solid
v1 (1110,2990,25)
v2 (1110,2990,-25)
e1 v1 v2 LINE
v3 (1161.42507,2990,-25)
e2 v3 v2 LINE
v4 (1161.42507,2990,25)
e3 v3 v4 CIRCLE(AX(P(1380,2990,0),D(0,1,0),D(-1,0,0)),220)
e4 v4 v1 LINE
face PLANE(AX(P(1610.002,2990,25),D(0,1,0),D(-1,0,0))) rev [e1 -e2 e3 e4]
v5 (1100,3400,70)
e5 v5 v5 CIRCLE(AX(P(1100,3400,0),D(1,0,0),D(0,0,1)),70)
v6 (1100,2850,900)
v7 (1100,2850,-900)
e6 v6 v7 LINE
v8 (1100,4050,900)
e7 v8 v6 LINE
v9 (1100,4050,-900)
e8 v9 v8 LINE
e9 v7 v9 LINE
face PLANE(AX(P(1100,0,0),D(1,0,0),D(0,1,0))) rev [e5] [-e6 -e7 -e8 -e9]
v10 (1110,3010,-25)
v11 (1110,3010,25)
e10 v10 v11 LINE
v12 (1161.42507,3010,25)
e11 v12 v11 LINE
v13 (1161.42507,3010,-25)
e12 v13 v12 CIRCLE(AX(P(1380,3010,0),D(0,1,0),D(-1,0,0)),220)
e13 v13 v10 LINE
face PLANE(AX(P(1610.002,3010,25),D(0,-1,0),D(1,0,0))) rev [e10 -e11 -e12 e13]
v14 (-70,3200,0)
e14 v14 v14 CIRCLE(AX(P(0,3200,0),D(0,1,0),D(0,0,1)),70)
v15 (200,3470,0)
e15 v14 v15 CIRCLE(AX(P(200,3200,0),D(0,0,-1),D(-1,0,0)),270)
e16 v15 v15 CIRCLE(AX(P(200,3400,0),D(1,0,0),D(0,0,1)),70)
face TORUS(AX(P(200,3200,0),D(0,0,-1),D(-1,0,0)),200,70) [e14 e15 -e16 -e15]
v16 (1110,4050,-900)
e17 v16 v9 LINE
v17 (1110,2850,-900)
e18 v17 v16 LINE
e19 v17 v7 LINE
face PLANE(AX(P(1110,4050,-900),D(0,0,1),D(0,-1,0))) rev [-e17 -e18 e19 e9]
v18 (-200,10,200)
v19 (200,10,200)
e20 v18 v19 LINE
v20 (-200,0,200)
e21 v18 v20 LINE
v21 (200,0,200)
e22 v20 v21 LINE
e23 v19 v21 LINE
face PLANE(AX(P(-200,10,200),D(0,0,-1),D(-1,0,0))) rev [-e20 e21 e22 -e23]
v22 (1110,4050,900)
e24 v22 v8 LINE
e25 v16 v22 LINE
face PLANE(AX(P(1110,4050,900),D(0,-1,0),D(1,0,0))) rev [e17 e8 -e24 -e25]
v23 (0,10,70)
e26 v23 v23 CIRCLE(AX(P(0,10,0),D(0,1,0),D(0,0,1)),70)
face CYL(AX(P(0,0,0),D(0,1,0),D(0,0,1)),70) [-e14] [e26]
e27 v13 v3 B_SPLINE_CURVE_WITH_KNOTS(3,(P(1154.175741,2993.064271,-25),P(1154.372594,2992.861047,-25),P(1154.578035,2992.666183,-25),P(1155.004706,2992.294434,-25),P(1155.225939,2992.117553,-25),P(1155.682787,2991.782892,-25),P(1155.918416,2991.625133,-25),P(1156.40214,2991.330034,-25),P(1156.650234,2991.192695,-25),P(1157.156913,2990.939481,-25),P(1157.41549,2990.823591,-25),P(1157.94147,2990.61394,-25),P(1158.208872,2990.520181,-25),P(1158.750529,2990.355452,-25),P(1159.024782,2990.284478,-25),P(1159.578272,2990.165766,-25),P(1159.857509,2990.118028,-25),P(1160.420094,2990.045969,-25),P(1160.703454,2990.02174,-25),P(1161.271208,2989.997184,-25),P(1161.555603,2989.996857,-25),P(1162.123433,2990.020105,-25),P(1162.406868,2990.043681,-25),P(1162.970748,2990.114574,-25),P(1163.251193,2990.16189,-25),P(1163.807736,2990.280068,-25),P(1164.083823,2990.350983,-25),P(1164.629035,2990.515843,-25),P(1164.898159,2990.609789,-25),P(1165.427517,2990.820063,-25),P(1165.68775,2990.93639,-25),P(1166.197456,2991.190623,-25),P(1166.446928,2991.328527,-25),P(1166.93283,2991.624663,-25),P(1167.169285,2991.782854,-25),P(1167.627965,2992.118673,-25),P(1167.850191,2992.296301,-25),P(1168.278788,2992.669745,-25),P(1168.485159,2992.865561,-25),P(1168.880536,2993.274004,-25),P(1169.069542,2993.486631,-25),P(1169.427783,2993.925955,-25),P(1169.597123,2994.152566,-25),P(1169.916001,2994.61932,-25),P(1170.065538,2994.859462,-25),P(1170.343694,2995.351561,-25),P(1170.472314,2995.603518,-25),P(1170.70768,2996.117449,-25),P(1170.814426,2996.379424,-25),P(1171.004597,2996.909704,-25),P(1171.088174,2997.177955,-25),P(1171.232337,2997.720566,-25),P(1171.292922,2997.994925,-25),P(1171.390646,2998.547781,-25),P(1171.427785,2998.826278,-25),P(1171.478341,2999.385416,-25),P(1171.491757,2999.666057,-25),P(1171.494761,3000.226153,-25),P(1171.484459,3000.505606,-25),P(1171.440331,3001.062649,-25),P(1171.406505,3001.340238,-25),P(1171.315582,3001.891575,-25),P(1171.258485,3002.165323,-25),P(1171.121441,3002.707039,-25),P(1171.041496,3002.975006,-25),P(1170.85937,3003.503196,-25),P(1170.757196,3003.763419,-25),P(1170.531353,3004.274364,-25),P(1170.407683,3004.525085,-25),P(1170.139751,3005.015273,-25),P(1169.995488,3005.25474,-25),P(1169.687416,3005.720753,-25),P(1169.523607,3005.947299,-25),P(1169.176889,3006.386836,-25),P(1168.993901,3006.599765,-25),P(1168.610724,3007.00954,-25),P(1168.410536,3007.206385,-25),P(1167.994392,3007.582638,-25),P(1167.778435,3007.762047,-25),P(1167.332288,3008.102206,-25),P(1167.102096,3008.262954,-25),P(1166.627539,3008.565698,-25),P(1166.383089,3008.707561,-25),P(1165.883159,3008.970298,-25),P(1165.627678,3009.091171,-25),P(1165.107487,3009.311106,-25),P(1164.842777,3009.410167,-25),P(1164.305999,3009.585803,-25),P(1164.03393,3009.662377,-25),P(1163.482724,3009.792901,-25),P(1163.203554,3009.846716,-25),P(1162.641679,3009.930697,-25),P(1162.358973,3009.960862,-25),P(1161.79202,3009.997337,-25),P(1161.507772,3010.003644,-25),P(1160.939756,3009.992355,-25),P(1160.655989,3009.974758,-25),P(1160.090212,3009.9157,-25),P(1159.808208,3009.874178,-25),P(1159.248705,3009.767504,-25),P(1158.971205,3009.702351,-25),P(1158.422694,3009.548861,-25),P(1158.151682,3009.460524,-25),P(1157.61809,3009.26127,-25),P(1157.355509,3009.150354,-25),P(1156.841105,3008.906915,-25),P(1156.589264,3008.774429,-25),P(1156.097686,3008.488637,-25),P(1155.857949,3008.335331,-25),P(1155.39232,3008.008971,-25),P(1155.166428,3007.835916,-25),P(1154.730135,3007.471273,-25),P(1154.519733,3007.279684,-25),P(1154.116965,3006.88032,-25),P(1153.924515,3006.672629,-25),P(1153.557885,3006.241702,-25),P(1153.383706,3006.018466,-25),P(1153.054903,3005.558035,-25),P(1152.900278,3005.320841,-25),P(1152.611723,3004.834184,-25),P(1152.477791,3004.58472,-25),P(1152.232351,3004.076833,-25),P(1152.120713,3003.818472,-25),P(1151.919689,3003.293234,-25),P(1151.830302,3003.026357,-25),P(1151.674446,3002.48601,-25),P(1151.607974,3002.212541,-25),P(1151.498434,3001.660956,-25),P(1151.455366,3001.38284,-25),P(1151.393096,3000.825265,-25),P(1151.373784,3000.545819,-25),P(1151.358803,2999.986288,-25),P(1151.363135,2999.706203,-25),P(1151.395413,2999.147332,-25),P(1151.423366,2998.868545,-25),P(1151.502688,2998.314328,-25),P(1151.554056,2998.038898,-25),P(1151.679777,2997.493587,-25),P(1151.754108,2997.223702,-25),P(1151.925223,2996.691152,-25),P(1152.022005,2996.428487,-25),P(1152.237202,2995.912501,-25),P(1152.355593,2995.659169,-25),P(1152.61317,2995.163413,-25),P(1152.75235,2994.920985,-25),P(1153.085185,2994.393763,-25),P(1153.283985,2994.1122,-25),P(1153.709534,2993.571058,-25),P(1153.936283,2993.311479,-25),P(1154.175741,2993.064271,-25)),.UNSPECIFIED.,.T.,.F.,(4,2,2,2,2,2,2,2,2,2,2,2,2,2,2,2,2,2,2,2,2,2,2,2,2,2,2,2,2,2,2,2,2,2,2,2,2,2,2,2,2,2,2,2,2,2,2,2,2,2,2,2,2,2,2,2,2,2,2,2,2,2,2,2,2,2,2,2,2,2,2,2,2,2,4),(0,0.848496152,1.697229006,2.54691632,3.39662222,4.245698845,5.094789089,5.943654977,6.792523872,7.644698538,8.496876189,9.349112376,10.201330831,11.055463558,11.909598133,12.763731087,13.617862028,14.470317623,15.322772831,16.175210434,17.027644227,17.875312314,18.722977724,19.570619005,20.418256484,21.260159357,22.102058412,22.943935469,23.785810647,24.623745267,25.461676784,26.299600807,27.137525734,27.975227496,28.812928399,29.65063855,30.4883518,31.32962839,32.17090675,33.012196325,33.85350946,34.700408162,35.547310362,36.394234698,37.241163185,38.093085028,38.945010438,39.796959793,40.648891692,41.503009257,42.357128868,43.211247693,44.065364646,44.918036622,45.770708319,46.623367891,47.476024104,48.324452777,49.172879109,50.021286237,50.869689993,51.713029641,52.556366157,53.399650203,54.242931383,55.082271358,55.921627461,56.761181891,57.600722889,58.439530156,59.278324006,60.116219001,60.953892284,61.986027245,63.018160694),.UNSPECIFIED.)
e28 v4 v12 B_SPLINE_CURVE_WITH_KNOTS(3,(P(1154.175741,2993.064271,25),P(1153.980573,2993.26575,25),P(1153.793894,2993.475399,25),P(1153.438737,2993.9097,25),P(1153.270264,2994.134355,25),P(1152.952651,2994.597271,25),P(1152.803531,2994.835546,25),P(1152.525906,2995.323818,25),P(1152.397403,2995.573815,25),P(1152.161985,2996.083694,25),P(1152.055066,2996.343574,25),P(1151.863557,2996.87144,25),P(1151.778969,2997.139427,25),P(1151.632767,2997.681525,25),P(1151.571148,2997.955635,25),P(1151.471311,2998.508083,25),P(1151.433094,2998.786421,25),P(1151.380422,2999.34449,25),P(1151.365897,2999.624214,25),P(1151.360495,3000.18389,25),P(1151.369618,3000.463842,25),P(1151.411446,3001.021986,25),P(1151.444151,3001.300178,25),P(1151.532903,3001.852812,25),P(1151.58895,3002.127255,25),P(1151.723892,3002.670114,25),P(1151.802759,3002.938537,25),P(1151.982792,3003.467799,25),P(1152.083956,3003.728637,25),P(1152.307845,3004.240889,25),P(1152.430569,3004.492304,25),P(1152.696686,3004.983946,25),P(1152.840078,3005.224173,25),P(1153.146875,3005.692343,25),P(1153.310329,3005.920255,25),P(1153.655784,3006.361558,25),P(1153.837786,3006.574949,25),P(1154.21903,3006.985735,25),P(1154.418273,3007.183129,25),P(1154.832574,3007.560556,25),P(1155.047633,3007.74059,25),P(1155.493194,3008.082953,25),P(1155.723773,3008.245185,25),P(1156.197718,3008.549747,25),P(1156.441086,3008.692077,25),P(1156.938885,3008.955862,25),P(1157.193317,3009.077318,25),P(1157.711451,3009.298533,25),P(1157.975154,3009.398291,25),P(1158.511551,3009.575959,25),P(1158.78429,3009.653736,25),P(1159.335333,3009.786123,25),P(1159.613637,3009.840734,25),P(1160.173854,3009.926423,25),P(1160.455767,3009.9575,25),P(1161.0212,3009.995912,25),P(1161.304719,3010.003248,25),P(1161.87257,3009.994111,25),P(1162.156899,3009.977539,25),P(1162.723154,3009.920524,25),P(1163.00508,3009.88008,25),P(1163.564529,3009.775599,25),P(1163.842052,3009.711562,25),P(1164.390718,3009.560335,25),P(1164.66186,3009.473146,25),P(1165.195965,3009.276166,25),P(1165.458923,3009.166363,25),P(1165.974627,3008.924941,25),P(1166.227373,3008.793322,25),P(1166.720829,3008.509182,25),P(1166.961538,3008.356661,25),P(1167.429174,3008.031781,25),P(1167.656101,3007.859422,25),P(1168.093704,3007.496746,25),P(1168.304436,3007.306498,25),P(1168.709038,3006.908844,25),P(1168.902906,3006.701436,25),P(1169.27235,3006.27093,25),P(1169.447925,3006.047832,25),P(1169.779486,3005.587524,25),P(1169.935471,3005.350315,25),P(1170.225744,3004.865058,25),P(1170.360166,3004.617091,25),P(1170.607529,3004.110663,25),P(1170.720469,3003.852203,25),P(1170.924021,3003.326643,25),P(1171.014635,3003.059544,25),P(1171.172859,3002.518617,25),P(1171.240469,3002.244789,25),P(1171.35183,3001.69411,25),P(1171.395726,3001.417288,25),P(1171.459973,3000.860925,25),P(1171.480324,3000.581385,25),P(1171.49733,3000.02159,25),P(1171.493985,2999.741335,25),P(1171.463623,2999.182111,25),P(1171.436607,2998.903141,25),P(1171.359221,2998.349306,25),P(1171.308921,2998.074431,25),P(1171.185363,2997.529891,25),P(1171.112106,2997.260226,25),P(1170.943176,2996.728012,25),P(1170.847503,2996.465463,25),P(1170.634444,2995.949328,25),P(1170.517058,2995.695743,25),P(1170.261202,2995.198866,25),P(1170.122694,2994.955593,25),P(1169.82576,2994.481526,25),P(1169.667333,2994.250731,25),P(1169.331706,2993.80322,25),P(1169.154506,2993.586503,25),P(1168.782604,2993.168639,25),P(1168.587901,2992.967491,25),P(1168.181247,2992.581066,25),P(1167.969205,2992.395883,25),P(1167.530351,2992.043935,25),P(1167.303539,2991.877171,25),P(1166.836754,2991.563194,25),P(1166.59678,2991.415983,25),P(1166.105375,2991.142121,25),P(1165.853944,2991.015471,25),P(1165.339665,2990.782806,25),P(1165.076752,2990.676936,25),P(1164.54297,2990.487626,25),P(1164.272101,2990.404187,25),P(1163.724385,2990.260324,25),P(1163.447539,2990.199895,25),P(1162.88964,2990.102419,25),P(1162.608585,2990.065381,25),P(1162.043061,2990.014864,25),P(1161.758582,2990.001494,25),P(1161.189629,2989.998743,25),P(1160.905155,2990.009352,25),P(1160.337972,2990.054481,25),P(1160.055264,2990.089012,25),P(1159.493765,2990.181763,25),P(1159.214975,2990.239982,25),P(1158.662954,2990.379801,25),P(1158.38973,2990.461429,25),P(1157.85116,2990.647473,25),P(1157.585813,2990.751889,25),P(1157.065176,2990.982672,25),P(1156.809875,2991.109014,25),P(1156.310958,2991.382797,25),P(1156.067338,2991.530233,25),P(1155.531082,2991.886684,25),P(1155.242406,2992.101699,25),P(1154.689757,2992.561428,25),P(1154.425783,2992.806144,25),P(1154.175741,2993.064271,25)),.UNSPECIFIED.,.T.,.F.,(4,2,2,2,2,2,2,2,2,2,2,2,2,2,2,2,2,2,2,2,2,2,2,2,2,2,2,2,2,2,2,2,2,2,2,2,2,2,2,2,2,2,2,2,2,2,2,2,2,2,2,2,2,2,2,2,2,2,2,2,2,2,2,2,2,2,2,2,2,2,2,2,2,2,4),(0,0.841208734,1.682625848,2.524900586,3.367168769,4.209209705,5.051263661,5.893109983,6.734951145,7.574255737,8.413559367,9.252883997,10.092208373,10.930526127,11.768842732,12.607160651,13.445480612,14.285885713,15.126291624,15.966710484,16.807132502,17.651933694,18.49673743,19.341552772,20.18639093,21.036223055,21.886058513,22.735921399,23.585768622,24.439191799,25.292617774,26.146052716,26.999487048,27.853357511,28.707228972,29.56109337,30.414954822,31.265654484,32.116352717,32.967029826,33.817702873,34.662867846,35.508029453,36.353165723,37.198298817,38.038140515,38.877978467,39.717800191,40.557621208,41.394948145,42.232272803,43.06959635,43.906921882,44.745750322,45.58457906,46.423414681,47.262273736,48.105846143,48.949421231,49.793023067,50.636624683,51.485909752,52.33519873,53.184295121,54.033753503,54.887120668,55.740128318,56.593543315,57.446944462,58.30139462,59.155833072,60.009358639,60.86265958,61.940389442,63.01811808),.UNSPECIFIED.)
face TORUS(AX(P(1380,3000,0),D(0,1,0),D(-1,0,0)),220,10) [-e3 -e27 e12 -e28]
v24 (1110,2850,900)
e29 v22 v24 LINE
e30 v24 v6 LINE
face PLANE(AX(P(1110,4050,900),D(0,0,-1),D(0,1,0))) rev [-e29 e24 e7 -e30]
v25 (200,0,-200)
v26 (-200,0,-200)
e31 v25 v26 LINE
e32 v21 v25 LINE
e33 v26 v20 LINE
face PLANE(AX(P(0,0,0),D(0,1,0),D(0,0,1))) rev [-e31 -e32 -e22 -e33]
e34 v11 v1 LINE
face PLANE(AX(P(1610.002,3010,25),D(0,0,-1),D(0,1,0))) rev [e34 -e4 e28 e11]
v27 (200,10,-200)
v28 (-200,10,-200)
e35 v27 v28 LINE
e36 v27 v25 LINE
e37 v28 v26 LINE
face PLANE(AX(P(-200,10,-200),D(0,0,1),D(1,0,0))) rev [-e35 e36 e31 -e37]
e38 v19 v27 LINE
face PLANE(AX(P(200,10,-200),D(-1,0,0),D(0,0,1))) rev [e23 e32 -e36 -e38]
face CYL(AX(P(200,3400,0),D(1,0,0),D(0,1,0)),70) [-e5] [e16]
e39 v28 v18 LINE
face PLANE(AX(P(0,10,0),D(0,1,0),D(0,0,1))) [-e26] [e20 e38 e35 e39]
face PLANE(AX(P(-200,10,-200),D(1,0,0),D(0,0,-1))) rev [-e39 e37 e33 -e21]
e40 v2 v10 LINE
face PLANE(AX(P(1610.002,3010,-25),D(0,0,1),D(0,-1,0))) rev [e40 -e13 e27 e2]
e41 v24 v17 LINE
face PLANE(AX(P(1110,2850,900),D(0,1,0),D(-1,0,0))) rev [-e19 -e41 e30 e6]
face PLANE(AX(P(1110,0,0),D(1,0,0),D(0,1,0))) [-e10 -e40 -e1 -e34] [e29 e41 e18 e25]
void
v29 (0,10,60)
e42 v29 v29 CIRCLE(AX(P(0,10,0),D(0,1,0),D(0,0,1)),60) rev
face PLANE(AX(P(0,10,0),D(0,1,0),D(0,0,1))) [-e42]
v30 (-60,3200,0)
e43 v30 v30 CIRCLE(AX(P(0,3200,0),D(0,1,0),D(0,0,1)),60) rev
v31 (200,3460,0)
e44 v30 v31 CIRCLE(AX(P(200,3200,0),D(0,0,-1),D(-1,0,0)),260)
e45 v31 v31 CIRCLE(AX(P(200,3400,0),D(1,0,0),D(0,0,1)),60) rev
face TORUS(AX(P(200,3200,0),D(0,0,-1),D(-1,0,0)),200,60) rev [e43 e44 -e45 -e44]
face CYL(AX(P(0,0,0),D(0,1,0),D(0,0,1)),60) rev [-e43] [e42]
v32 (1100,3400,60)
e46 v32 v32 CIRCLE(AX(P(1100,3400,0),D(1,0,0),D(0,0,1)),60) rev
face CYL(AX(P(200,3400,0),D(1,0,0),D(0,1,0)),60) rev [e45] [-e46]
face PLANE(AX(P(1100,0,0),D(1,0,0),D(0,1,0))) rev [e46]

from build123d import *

# Parameters (mm, degrees)
IZIM1_W                     = 400
IZIM1_H                     = 400
Y_KSEKLIK_EKSTR_ZYON1_DEPTH = 10
IZIM2_R                     = 70
IZIM2_R_2                   = 60
IZIM5_W                     = 1800
IZIM5_H                     = 1200
Y_KSEKLIK_EKSTR_ZYON2_DEPTH = 10
IZIM11_R                    = 10
Y_KSEKLIK_EKSTR_ZYON6_START = 2990
Y_KSEKLIK_EKSTR_ZYON6_DEPTH = 20


with BuildPart() as part:
    # Çizim1 → Yükseklik-Ekstrüzyon1 (new body)
    with BuildSketch(Plane(origin=(0, 0, 0), x_dir=(1, 0, 0), z_dir=(0, 1, 0))):
        Rectangle(IZIM1_W, IZIM1_H)
    extrude(amount=Y_KSEKLIK_EKSTR_ZYON1_DEPTH)

    # Süpür1: sweep along a path in Çizim3
    with BuildLine(Plane.XY) as s_p_r1_path:
        Line((0, 0), (0, 3200))
        ThreePointArc((0, 3200), (58.578643763, 3341.421356237), (200, 3400))
        Line((200, 3400), (1100, 3400))
    # Çizim2 → Süpür1 (sweep)
    with BuildSketch(Plane(origin=(0, 0, 0), x_dir=(1, 0, 0), z_dir=(0, 1, 0))):
        Circle(IZIM2_R)
        Circle(IZIM2_R_2, mode=Mode.SUBTRACT)
    sweep(path=s_p_r1_path.line)

    # Çizim5 → Yükseklik-Ekstrüzyon2 (add)
    with BuildSketch(Plane(origin=(1100, 0, 0), x_dir=(0, 0, -1), z_dir=(1, 0, 0))):
        with Locations((0, 3450)):
            Rectangle(IZIM5_W, IZIM5_H)
    extrude(amount=Y_KSEKLIK_EKSTR_ZYON2_DEPTH)



with BuildPart() as body_2:
    # Çizim11 → Döndür1 (revolve)
    with BuildSketch(Plane.XY):
        with Locations((1160, 3000)):
            Circle(IZIM11_R)
    revolve(axis=Axis((1380, 3213.20754823, 0), (0, -1, 0)))


with BuildPart() as part_1:
    add(part.part)

    add(body_2.part)  # Yükseklik-Ekstrüzyon6 merges body 2
    # Yükseklik-Ekstrüzyon6: read off the stored shape, not the designer's step
    # Yükseklik-Ekstrüzyon6 outline → Yükseklik-Ekstrüzyon6 (add)
    with BuildSketch(Plane(origin=(0, 0, 0), x_dir=(1, 0, 0), z_dir=(0, 1, 0)).offset(Y_KSEKLIK_EKSTR_ZYON6_START)):
        with BuildLine():
            Line((1110, -25), (1161.425070056, -25))
            ThreePointArc((1161.425070056, -25), (1160, 0), (1161.425070056, 25))
            Line((1161.425070056, 25), (1110, 25))
            Line((1110, 25), (1110, -25))
        make_face()
    extrude(amount=Y_KSEKLIK_EKSTR_ZYON6_DEPTH)


solid = part_1.part
